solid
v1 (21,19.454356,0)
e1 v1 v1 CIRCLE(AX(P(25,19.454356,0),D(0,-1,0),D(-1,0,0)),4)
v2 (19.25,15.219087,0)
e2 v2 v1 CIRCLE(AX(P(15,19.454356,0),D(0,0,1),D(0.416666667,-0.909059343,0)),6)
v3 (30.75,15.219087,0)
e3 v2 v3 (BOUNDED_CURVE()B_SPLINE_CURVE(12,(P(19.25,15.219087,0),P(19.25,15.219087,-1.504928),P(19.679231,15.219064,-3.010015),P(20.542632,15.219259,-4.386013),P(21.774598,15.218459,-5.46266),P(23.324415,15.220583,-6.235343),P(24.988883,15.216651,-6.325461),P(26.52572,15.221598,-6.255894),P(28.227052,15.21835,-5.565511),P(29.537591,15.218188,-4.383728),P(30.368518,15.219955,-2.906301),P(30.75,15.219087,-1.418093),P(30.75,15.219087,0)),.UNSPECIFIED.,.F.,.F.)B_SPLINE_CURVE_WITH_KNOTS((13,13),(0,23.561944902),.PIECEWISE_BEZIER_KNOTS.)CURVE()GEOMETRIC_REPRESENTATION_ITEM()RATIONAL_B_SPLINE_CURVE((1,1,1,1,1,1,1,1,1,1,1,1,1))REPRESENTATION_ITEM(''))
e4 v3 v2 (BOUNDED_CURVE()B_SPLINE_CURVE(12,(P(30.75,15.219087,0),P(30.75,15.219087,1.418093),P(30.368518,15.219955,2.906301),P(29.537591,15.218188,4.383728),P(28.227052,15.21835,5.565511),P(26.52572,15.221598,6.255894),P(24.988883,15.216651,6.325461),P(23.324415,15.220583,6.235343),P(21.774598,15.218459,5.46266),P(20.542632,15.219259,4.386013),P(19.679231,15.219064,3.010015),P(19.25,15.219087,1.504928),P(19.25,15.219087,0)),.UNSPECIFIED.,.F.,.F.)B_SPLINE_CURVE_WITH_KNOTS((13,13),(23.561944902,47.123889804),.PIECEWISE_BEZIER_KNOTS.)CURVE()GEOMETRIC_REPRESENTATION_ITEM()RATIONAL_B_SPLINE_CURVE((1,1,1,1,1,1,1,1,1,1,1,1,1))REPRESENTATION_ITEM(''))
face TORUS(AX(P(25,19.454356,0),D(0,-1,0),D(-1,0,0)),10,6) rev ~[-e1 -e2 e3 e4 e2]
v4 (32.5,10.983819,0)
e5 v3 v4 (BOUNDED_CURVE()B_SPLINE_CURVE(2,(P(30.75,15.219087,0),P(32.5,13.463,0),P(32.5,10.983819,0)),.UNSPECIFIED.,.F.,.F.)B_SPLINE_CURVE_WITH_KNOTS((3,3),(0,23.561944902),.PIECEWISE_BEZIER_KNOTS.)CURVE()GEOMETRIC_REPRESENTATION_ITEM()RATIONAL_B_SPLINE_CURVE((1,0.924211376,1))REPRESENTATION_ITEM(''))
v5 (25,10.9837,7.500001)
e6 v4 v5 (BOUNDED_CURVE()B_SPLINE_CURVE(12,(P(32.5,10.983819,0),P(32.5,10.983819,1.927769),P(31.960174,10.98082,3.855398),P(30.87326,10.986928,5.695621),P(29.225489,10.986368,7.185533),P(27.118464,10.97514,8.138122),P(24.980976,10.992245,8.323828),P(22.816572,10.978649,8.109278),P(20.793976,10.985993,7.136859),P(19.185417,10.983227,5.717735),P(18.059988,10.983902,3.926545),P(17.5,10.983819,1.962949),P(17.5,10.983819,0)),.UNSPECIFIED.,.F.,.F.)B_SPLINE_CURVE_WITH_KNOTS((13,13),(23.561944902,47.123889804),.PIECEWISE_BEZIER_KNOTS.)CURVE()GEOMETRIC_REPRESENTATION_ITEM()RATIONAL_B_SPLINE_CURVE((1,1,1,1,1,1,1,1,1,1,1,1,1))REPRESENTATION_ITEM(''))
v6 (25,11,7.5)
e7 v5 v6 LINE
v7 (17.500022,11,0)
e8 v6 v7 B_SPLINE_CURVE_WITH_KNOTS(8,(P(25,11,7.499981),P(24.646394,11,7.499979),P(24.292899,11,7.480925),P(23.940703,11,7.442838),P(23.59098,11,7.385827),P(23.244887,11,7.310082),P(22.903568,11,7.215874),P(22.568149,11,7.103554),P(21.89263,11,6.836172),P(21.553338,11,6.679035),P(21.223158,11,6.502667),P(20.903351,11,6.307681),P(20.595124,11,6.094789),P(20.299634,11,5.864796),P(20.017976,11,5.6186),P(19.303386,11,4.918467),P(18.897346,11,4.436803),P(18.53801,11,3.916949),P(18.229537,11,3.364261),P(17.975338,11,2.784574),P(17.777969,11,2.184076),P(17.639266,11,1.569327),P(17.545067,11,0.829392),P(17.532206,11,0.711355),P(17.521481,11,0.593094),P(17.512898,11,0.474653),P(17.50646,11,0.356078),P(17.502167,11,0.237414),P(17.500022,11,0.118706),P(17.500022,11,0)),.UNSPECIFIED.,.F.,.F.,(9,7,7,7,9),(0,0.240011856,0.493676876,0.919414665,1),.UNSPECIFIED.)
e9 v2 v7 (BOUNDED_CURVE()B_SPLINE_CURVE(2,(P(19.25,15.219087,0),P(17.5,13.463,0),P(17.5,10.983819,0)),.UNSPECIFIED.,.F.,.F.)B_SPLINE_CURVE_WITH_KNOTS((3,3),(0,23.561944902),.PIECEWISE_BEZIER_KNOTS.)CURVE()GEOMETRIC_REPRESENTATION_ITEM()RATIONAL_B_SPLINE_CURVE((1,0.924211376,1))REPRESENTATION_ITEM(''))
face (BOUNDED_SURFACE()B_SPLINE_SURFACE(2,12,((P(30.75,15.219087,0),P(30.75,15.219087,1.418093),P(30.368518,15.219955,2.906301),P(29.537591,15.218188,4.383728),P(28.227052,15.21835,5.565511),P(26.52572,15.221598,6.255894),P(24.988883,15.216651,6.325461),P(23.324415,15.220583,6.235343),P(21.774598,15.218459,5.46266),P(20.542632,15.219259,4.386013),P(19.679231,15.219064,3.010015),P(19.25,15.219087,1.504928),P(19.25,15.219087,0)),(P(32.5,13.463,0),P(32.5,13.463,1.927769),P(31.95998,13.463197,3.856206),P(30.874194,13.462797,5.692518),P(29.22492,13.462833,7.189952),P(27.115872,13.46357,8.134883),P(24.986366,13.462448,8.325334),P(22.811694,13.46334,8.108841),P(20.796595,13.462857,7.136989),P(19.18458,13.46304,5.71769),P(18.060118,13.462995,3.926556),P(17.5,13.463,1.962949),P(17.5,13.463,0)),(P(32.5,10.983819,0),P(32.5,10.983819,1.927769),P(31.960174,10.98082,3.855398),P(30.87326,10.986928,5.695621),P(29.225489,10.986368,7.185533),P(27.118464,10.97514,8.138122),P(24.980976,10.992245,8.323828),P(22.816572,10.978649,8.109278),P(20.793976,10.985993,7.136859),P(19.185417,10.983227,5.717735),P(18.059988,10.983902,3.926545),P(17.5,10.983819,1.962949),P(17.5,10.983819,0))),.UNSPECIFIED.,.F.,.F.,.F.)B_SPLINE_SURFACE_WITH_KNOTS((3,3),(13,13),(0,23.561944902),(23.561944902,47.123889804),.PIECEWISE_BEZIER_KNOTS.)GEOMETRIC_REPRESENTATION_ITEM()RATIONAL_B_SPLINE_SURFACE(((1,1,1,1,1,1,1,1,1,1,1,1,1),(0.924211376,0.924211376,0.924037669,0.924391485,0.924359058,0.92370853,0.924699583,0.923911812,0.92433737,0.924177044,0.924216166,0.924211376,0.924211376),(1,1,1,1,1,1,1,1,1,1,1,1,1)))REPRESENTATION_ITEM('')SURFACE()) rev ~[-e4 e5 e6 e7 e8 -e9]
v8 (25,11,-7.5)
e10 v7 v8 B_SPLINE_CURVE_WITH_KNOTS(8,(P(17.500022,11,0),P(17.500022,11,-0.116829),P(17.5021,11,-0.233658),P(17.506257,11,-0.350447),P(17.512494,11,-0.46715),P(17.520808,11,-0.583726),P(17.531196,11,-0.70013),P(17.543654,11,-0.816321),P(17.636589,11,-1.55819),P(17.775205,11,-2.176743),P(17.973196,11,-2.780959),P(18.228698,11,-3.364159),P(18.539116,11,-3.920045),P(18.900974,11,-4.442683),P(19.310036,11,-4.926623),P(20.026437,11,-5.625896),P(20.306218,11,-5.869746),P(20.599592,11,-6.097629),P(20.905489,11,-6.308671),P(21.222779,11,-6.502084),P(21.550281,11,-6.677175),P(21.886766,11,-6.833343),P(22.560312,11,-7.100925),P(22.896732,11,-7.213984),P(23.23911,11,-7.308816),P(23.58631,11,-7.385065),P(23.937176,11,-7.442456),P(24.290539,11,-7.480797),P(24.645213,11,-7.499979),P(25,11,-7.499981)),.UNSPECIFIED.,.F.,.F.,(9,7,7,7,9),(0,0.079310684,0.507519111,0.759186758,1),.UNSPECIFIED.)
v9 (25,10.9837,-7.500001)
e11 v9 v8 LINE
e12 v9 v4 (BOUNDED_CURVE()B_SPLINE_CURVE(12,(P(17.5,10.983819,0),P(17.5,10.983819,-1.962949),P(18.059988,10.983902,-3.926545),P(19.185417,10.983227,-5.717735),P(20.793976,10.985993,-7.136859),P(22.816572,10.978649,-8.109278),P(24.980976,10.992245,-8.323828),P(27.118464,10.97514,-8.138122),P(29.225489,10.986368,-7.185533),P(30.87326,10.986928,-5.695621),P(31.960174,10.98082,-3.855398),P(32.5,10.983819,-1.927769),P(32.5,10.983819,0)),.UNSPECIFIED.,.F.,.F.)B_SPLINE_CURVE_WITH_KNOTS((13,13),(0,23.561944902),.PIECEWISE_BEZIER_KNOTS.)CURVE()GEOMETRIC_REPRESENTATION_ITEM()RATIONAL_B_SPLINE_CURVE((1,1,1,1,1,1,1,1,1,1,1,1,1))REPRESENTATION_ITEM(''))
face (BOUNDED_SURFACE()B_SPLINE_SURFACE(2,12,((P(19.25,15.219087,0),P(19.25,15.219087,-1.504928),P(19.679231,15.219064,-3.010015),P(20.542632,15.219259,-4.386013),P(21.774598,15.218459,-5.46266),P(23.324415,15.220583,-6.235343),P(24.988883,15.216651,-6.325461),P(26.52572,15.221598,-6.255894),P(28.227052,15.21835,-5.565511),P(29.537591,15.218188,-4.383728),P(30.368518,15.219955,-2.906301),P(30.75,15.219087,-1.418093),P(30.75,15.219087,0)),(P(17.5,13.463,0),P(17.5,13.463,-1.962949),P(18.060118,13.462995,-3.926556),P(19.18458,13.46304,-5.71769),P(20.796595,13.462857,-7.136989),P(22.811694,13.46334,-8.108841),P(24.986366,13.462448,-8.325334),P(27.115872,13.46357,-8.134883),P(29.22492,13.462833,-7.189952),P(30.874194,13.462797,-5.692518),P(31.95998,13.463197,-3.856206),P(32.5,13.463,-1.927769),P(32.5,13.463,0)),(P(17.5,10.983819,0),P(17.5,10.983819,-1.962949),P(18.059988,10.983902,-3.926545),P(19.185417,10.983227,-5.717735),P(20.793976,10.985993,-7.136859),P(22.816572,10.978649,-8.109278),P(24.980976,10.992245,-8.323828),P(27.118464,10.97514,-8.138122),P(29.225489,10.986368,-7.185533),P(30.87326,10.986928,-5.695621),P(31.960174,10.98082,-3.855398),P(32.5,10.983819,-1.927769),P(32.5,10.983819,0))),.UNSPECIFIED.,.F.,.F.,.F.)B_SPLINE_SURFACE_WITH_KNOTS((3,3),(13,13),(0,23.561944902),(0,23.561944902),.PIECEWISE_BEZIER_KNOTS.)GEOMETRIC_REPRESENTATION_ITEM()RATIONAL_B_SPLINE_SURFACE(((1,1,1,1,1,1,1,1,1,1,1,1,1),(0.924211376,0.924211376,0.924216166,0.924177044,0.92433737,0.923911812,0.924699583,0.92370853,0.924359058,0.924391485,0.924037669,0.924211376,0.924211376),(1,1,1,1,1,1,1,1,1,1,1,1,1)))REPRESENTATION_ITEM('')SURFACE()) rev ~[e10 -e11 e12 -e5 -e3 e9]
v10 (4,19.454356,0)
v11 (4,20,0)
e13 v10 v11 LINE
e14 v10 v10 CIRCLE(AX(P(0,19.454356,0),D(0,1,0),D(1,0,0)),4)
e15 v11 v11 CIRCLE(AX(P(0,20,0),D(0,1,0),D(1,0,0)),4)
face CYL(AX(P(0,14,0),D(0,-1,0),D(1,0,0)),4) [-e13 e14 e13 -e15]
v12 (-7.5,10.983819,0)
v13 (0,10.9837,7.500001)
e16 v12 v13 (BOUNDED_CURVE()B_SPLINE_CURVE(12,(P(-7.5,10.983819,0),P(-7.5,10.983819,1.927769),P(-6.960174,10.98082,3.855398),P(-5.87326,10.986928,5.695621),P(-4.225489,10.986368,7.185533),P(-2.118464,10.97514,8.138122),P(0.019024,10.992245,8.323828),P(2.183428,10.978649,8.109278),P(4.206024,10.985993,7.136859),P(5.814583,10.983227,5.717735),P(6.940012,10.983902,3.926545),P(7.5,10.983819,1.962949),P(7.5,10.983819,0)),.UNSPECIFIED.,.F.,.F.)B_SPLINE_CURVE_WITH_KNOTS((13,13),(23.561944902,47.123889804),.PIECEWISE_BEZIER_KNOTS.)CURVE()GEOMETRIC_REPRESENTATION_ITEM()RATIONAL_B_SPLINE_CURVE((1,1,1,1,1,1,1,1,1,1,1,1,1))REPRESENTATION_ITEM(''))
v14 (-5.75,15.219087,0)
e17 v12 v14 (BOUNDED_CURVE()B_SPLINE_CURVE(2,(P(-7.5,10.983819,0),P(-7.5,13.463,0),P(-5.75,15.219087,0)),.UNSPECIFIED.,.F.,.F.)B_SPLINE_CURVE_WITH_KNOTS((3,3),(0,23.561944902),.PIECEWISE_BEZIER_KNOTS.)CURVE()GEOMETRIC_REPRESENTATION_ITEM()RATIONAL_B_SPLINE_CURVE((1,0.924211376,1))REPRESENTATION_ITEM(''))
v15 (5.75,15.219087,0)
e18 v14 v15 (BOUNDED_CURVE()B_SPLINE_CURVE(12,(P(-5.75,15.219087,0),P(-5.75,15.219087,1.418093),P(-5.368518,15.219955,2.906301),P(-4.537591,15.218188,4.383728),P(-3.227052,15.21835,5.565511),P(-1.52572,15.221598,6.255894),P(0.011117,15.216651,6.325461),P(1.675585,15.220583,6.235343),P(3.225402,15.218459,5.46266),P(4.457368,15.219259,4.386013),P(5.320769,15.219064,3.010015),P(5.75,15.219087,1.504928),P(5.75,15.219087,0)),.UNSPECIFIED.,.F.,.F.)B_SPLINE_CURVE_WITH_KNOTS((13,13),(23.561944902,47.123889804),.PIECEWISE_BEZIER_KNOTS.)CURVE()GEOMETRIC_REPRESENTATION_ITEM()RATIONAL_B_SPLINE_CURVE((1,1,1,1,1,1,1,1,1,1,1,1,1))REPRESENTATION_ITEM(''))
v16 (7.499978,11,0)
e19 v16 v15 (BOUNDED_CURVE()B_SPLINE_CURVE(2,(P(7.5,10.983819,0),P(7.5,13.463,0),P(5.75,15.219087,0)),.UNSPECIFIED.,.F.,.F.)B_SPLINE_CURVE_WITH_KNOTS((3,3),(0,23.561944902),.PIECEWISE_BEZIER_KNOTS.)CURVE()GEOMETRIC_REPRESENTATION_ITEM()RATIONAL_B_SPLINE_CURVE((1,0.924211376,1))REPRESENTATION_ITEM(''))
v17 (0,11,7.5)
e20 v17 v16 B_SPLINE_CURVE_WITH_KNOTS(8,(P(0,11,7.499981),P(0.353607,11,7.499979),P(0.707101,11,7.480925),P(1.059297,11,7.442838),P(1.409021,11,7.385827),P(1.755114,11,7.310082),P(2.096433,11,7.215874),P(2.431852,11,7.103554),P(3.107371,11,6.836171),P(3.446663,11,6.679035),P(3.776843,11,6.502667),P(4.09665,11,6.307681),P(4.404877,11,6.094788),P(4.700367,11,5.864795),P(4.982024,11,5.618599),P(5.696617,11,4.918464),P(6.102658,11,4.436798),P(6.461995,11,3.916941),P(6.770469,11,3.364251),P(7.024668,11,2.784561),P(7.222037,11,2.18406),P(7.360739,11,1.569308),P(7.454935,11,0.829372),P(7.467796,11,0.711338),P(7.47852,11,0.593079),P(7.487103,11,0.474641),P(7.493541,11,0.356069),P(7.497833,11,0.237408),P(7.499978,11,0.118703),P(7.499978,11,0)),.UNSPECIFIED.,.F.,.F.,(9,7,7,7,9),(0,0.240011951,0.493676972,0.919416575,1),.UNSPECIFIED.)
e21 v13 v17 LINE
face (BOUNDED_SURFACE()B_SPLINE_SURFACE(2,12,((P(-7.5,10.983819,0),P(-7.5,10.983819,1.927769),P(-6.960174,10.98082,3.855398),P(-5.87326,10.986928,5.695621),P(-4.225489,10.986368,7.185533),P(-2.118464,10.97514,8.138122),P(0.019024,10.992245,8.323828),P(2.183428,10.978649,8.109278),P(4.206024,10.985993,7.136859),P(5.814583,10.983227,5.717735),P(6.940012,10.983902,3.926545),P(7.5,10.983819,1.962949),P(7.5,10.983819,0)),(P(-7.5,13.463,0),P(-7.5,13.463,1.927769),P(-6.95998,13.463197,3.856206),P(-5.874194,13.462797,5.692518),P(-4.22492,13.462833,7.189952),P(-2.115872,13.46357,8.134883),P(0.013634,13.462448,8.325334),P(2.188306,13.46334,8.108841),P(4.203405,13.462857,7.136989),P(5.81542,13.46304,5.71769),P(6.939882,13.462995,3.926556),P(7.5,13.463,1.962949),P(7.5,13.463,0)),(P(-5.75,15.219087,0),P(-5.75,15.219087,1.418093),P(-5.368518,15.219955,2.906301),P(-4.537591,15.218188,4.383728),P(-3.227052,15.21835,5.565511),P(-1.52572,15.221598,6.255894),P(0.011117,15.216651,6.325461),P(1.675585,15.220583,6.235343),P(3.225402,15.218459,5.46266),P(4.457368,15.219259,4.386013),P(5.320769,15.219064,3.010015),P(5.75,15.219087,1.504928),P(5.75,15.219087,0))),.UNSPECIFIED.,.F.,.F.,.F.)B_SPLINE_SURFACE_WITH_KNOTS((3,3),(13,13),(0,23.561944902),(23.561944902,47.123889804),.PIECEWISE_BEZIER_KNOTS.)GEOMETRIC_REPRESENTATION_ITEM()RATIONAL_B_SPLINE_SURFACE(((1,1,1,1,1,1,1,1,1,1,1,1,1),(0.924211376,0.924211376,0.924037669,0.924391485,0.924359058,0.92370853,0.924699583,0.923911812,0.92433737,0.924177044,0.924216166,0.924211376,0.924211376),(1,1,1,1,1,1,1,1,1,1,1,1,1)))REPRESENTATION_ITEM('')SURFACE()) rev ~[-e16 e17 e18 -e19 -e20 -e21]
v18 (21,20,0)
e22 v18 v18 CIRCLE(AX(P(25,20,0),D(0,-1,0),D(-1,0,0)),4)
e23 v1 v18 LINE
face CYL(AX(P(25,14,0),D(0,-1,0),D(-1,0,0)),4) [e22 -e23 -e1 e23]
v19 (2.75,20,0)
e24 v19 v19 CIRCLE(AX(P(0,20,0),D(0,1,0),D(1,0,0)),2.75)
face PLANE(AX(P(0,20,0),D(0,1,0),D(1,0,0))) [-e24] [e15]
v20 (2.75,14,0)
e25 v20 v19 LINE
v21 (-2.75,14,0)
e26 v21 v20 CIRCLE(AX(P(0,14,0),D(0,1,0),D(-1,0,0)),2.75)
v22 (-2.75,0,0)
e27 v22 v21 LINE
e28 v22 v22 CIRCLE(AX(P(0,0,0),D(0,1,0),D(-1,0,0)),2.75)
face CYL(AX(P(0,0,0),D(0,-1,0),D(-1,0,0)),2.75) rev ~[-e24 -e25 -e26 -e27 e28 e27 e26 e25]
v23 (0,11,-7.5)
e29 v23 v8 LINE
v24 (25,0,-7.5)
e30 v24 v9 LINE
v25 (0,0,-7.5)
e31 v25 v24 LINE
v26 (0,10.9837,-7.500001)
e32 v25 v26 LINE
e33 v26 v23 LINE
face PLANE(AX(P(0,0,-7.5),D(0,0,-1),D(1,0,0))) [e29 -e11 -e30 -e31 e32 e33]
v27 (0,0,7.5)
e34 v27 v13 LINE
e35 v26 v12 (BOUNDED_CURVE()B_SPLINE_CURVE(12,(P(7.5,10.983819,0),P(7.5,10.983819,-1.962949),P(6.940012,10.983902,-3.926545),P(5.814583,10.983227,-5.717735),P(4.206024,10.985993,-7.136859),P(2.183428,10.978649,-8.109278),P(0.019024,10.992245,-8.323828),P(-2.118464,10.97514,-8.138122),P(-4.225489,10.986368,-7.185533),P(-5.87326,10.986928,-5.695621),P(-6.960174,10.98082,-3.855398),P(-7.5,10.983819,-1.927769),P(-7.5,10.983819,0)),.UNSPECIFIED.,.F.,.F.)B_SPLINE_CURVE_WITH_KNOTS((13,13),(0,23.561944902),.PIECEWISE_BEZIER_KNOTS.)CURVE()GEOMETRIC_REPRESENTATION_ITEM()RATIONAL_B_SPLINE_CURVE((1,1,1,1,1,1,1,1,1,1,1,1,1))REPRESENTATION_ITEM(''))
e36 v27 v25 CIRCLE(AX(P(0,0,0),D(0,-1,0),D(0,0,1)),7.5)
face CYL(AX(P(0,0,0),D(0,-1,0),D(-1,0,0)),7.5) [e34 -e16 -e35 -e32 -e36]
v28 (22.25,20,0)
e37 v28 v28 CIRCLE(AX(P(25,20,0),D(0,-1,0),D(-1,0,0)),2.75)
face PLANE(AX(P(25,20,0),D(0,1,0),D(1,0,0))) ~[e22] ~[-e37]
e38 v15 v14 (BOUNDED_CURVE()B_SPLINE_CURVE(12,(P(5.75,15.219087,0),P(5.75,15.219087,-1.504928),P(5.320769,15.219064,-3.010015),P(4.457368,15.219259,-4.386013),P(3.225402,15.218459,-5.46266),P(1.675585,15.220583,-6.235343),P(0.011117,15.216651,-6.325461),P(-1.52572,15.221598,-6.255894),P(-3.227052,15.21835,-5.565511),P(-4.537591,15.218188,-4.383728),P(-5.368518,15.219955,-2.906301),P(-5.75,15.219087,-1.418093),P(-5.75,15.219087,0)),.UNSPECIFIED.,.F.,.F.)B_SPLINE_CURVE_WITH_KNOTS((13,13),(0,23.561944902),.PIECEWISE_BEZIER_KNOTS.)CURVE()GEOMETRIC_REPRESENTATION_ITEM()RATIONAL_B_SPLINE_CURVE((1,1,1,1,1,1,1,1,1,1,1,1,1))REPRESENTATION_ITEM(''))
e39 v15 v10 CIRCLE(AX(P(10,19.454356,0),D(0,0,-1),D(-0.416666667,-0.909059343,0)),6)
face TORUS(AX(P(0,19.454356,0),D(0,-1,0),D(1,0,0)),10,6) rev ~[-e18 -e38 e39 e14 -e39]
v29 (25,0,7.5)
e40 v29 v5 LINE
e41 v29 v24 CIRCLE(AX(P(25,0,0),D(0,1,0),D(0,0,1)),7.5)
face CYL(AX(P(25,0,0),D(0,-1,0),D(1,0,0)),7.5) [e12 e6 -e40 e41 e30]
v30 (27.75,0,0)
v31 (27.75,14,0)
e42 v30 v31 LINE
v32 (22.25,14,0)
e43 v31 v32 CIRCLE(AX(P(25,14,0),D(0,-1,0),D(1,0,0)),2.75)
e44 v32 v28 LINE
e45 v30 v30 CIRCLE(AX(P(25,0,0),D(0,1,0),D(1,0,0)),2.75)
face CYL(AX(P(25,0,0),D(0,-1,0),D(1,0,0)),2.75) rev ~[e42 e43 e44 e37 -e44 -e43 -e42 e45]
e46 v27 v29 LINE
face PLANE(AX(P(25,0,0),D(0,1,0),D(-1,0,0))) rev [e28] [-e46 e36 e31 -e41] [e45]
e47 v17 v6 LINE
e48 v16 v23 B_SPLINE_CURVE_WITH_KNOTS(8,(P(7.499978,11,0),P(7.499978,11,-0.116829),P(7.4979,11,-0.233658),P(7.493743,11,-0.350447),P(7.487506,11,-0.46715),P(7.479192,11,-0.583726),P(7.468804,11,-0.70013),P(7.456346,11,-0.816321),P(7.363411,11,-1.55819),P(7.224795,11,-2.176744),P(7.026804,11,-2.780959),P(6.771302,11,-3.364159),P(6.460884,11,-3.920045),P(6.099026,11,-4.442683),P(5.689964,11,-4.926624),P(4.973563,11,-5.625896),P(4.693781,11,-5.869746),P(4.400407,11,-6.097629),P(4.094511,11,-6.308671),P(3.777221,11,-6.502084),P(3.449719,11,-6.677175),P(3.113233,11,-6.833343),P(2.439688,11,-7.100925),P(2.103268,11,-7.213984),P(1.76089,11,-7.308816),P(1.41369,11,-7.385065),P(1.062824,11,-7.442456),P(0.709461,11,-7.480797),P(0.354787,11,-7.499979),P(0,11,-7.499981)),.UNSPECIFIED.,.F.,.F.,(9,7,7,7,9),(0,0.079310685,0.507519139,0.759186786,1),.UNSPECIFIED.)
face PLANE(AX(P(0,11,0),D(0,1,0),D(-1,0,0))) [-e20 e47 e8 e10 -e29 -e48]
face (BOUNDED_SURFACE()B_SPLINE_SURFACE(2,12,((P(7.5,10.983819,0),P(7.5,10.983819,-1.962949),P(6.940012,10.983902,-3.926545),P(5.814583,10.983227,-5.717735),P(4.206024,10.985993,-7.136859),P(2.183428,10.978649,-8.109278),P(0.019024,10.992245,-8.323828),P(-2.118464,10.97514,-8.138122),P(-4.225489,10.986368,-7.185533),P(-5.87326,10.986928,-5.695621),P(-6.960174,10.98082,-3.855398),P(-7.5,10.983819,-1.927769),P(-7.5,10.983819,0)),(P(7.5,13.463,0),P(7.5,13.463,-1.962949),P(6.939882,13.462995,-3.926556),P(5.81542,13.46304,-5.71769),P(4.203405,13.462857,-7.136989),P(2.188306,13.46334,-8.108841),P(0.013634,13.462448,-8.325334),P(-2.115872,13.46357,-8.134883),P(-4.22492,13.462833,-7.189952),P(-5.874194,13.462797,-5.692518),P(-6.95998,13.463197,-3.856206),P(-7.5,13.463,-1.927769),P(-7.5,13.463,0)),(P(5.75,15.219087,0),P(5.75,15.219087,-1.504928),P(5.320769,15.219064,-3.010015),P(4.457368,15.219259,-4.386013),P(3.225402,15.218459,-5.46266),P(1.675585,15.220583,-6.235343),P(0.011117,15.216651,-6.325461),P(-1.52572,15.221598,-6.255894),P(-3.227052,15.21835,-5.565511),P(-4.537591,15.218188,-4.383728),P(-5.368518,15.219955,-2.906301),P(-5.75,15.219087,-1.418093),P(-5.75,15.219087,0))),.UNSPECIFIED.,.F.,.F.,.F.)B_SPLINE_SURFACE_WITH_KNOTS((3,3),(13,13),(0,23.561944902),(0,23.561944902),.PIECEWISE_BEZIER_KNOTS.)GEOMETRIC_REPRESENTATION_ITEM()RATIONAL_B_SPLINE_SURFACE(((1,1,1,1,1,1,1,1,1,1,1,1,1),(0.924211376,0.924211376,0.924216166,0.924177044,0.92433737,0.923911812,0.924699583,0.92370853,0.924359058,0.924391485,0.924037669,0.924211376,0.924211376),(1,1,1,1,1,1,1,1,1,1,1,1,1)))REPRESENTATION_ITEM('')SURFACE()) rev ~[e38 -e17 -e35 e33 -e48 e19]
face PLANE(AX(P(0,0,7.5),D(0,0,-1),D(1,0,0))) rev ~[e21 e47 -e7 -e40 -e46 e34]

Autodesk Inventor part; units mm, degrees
ref_plane "XZ Plane" through (0, 0, 0) normal (0, 1, 0) x (-1, 0, 0)
ref_plane "XY Plane" through (0, 0, 0) normal (0, 0, 1) x (1, 0, 0)
sketch "Sketch1" plane through (0, 0, 0) normal (0, 1, 0) x (-1, 0, 0)
  circle A0 centre (0, 0) radius 7.5
  circle A1 centre (0, 0) radius 2.75
  dimension "d0" = 15
  dimension "d1" = 5.5
extrude "Extrusion1" add sketch "Sketch1" along normal blind 14
sketch "Sketch2" plane through (0, 14, 0) normal (0, 1, 0) x (1, 0, 0)
  circle A0 centre (0, 0) radius 2.75 projected
  circle A1 centre (0, 0) radius 2.75
  circle A2 centre (0, 0) radius 4
  dimension "d4" = 5.5
  dimension "d5" = 8
extrude "Extrusion2" add sketch "Sketch2" along normal blind 6
fillet "Fillet1" radius 6 1 edges at (-4, 14, 0)
fillet "Fillet2" radius 6 2 edges at (0, 14, -7.5) (0, 14, 7.5)
ref_plane "Work Plane1" through (12.5, 0, 0) normal (1, 0, 0) x (0, 1, 0)
mirror "Mirror1" about plane through (12.5, 0, 0) normal (1, 0, 0) of "Extrusion1", "Extrusion2", "Fillet1", "Fillet2"
sketch "Sketch3" plane through (0, 0, 0) normal (0, 1, 0) x (-1, 0, 0)
  circle A0 centre (-25, 0) radius 2.75 projected
  line L0 (-25, 0) -> (-25, 2.75)
  line L1 (-25, 0) -> (-25, -2.75)
  line L2 (0, 0) -> (0, -2.75)
  circle A1 centre (0, 0) radius 2.75 projected
  line L3 (0, 0) -> (0, 2.75)
  line L4 (-25, 2.75) -> (0, 2.75)
  line L5 (0, 2.75) -> (0, 7.5)
  line L6 (0, 7.5) -> (-25, 7.5)
  line L7 (-25, 7.5) -> (-25, 2.75)
  line L8 (-25, -2.75) -> (0, -2.75)
  line L9 (0, -2.75) -> (0, -7.5)
  line L10 (0, -7.5) -> (-25, -7.5)
  line L11 (-25, -7.5) -> (-25, -2.75)
  dimension "d11" = 25
  dimension "d12" = 4.75
  dimension "d13" = 25
  dimension "d14" = 4.75
extrude "Extrusion3" add sketch "Sketch3" along normal blind 11 contours A0 L4 A1 L8 | L7 L6 L5 L4 | L8 L9 L10 L11
properties part number "4mm_Roller_Spacer_simple"
